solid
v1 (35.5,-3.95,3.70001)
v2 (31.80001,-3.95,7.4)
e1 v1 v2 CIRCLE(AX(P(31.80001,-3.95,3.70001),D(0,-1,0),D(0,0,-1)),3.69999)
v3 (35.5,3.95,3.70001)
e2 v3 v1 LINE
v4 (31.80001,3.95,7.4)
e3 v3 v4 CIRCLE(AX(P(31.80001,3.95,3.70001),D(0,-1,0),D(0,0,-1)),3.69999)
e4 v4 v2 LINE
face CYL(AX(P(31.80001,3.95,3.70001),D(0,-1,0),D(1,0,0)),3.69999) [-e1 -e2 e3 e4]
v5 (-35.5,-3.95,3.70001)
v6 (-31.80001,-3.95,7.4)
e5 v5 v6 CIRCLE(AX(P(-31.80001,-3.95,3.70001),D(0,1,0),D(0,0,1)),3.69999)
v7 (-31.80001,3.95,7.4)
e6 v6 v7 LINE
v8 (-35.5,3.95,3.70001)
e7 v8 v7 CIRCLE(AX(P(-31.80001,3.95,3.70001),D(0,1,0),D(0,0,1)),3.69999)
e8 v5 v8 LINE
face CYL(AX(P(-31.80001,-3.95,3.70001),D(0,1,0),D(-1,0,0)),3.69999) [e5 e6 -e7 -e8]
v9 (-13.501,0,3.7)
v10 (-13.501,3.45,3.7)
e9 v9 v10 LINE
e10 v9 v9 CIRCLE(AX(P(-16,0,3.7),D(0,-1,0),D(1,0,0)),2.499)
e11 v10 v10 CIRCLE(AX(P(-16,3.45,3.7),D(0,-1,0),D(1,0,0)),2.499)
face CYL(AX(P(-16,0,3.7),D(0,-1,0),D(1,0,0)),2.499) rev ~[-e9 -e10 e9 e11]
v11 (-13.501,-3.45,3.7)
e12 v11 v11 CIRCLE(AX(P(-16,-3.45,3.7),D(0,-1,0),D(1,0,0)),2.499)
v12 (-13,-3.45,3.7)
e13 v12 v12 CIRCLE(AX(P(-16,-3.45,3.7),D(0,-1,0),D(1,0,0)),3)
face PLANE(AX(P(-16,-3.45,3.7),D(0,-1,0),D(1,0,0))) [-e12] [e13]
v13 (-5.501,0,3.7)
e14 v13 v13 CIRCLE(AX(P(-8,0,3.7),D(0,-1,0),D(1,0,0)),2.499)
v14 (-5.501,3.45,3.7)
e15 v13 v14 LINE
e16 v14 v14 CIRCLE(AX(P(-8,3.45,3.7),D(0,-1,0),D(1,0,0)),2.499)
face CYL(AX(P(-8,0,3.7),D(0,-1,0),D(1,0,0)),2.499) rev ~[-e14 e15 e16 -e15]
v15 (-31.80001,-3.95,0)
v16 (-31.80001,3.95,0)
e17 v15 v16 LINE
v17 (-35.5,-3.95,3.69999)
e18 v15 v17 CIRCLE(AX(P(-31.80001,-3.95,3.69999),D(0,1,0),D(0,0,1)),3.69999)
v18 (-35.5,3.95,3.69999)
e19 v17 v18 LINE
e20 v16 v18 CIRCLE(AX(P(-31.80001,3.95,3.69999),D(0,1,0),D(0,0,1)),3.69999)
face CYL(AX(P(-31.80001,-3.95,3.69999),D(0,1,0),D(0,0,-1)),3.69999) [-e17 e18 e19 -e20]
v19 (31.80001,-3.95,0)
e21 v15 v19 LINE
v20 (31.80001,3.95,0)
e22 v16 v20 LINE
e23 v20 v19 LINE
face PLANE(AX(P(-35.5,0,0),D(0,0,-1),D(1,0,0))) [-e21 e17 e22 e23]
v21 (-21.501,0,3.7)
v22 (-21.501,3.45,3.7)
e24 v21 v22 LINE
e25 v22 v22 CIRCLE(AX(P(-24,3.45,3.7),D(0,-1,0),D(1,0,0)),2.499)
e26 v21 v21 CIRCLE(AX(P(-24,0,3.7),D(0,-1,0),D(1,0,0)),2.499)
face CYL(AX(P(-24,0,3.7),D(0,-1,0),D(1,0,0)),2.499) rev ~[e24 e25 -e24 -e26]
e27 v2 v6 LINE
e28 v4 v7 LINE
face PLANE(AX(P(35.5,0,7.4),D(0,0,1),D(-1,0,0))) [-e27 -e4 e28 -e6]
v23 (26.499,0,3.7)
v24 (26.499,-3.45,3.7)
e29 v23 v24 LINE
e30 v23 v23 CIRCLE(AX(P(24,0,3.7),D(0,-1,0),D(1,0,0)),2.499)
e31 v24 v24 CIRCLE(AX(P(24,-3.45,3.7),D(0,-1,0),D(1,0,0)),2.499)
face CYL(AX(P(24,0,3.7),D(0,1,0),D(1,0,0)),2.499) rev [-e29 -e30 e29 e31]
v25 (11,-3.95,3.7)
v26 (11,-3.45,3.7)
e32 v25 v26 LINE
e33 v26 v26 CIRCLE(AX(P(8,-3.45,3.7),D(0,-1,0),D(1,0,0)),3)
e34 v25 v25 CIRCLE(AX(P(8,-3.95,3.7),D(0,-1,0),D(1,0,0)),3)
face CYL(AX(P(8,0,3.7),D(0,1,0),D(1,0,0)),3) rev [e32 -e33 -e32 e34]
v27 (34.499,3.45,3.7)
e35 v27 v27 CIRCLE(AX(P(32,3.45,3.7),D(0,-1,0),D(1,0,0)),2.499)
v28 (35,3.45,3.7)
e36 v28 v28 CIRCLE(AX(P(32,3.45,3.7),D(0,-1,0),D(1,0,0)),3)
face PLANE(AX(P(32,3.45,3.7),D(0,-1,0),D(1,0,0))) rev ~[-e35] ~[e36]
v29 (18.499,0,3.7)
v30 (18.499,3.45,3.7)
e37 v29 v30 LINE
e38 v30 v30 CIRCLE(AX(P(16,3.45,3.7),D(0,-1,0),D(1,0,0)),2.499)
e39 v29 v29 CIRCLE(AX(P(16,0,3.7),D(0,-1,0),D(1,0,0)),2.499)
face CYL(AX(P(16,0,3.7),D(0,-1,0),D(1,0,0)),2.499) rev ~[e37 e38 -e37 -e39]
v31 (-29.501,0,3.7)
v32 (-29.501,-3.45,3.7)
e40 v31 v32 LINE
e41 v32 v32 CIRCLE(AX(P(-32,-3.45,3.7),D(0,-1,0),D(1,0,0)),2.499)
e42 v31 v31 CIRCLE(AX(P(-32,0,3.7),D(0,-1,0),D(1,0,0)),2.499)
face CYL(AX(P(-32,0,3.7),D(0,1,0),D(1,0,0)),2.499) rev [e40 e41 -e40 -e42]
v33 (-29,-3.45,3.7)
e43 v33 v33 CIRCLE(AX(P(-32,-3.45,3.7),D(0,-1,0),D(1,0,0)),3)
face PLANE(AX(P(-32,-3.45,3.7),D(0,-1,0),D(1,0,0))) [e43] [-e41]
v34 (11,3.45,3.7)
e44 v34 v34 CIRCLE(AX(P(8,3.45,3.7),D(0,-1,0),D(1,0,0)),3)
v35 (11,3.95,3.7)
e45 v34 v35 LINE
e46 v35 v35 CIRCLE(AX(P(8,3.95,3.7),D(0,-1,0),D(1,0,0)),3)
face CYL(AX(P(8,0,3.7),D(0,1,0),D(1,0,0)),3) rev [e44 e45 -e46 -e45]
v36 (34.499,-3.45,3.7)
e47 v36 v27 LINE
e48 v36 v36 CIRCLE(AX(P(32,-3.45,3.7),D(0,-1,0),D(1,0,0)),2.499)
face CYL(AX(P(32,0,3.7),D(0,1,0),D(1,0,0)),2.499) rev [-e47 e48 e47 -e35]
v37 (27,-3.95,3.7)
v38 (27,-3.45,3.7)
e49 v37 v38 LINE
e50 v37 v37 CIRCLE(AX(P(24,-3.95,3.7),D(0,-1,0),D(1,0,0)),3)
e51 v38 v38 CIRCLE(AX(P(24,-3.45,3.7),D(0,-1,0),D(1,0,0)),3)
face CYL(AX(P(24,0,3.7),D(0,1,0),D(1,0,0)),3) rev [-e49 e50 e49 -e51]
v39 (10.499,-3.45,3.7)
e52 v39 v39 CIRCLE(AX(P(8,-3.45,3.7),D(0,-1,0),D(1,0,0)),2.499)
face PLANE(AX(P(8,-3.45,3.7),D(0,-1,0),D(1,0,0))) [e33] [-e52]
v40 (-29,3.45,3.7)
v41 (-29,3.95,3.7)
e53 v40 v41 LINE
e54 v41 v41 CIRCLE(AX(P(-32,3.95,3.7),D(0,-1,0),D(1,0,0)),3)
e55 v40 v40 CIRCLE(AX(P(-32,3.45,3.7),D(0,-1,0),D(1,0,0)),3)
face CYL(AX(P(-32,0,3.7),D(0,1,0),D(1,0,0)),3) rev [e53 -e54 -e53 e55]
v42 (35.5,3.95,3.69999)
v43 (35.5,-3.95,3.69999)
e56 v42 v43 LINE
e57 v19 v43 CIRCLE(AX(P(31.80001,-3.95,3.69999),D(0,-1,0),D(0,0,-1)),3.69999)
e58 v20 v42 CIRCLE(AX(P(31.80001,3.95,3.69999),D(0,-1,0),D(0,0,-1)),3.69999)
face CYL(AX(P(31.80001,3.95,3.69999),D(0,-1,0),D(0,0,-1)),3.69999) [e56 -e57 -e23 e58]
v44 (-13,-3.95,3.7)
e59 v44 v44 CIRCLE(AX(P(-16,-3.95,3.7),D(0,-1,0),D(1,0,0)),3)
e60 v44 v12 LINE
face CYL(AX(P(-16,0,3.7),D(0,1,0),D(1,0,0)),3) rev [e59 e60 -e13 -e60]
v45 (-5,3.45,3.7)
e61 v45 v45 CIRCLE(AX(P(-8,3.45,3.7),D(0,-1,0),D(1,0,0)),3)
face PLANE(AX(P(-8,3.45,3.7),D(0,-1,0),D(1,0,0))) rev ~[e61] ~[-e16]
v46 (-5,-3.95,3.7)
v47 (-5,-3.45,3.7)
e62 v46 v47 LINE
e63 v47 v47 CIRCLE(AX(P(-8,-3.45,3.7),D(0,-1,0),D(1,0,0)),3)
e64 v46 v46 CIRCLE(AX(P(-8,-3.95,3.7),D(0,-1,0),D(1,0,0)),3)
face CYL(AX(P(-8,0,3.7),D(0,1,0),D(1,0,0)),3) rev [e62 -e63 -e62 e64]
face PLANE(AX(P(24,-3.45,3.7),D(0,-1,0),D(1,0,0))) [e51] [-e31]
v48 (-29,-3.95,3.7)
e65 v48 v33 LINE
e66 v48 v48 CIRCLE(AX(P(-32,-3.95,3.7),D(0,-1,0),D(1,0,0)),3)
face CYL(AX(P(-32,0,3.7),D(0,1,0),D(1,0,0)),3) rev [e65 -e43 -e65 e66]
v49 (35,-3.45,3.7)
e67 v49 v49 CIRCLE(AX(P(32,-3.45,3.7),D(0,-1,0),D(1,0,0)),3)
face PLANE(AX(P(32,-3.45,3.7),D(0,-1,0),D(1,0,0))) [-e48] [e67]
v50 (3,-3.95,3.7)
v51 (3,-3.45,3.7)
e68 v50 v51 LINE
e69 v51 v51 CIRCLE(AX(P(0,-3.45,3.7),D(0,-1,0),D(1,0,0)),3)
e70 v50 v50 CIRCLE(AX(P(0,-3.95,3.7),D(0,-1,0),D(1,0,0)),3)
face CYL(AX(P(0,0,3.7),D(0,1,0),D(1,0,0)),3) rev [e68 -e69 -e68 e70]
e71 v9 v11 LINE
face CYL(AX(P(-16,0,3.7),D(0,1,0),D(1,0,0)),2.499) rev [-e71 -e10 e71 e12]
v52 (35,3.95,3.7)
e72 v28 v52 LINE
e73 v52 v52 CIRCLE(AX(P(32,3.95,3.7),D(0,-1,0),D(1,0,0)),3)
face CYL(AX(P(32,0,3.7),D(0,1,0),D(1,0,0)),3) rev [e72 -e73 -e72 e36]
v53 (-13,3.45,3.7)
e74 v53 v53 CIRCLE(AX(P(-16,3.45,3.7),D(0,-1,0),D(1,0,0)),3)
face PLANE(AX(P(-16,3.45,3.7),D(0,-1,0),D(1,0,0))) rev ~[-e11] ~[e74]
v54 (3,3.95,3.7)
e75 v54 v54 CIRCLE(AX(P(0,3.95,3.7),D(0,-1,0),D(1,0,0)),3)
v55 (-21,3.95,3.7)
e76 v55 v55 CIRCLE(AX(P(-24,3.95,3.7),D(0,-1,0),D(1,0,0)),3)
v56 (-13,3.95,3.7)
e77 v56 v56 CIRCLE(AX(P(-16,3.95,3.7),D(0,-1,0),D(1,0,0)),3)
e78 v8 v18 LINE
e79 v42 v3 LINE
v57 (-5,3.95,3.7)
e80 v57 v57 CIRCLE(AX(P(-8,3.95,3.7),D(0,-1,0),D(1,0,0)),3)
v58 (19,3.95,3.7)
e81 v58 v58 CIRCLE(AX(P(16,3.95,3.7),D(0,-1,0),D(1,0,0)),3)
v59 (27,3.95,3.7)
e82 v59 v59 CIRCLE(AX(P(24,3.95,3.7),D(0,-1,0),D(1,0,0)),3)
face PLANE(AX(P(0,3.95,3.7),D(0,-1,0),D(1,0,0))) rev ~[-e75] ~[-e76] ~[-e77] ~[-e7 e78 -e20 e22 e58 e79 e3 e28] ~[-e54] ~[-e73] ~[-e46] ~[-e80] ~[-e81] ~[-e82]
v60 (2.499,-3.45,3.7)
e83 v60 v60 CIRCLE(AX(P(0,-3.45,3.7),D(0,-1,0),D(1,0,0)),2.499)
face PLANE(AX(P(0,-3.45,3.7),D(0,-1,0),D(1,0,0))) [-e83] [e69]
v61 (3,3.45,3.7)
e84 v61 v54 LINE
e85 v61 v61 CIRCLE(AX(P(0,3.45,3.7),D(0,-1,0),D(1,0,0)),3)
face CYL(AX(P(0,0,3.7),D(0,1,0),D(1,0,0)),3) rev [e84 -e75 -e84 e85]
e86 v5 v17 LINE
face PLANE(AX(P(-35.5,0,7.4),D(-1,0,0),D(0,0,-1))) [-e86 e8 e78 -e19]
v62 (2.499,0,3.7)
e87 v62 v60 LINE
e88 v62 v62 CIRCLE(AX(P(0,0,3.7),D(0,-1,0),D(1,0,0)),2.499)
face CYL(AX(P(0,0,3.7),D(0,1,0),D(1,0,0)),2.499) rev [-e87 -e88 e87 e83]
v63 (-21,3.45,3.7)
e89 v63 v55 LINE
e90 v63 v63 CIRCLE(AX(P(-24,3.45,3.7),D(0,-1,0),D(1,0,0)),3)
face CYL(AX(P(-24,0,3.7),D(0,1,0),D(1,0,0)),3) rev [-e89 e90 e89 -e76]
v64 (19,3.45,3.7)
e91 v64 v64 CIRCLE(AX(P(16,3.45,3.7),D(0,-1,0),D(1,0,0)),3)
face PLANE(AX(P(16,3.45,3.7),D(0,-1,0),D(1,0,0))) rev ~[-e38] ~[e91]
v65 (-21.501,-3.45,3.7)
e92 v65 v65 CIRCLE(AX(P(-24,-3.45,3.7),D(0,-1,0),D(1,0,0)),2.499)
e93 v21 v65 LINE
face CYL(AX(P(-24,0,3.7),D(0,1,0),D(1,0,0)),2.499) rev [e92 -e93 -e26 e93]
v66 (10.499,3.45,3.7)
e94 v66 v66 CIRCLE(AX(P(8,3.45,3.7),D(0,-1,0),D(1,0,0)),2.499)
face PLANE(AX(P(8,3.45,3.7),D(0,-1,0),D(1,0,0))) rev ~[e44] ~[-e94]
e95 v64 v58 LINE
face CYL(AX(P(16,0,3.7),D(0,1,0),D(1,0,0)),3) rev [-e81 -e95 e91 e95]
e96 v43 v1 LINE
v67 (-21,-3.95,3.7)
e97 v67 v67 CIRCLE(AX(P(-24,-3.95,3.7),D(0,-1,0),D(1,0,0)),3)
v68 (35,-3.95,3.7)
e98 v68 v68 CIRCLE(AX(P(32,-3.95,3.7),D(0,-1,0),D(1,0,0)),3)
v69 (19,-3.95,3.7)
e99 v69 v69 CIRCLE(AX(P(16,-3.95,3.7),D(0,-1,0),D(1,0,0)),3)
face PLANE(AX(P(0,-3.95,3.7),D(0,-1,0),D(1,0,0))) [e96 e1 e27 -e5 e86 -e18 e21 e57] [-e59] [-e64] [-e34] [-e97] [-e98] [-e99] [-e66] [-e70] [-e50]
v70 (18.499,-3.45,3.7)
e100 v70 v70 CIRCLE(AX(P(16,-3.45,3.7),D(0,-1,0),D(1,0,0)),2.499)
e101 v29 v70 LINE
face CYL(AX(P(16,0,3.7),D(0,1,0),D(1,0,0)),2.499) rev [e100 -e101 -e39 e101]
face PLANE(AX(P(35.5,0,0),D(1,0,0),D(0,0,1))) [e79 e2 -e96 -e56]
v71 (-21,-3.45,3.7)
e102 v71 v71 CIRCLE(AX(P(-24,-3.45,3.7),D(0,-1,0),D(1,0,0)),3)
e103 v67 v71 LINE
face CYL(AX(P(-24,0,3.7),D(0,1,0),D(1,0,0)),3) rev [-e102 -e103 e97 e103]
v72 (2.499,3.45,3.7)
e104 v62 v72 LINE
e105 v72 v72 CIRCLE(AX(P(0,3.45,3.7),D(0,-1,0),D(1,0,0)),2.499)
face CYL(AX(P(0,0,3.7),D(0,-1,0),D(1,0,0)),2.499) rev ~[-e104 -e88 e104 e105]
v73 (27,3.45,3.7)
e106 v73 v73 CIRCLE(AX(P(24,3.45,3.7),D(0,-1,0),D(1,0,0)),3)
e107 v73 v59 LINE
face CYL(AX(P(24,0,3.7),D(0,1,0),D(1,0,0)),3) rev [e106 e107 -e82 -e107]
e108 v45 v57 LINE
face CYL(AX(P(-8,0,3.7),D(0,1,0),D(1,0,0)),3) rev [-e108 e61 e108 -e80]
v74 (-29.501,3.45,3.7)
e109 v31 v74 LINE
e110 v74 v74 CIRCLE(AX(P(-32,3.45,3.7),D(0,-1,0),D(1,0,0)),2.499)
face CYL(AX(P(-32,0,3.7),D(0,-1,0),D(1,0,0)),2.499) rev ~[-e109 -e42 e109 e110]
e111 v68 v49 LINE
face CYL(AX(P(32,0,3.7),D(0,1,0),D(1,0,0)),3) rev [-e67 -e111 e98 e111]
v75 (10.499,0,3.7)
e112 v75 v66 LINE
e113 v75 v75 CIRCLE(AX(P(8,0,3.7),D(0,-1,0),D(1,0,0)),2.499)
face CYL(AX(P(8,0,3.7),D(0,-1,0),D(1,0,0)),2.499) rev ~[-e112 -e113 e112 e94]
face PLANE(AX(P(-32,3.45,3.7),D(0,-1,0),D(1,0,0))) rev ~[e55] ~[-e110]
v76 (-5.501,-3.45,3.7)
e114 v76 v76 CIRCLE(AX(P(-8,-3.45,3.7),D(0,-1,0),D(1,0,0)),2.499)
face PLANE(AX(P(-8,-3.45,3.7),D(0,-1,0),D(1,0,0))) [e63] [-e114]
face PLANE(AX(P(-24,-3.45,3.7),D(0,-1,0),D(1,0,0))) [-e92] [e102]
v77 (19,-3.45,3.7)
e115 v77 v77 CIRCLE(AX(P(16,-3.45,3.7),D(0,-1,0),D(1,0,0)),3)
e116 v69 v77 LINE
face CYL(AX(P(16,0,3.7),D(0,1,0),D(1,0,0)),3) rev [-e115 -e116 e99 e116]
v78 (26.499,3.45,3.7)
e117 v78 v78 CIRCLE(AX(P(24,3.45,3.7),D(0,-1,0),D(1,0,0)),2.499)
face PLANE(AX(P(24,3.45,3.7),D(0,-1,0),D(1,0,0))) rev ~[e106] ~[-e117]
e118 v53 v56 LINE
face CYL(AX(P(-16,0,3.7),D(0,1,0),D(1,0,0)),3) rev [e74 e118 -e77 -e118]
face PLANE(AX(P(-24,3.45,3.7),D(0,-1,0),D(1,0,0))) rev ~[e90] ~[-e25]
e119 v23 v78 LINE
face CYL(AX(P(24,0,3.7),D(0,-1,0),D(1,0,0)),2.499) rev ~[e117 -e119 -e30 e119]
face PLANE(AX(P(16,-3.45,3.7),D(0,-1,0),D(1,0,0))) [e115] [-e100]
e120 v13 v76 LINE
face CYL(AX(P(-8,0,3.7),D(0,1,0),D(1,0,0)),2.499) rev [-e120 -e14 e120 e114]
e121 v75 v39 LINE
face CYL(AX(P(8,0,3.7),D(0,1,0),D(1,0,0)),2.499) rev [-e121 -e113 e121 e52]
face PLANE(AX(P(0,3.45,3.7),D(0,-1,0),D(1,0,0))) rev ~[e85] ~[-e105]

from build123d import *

# Parameters (mm, degrees)
F0_R     = 3
F1_DEPTH = 3.95
F0_R_2   = 2.499
F2_DEPTH = 3.45
F3_R     = 3.69999
F4_R     = 3.69999


# Not quite as in the source:
# - a fillet or chamfer is up to 0.001 mm smaller than in the source, because OpenCascade refuses the exact size


with BuildPart() as f1:
    # F0 (on Front) → F1 (new body, symmetric)
    with BuildSketch(Plane.XZ):
        Polygon((-35.5, 0), (0, 0), (35.5, 0), (35.5, 7.4), (-35.5, 7.4), align=None)
        with Locations((-32, 3.7)):
            Circle(F0_R, mode=Mode.SUBTRACT)
        with Locations((-24, 3.7)):
            Circle(F0_R, mode=Mode.SUBTRACT)
        with Locations((-16, 3.7)):
            Circle(F0_R, mode=Mode.SUBTRACT)
        with Locations((-8, 3.7)):
            Circle(F0_R, mode=Mode.SUBTRACT)
        with Locations((0, 3.7)):
            Circle(F0_R, mode=Mode.SUBTRACT)
        with Locations((8, 3.7)):
            Circle(F0_R, mode=Mode.SUBTRACT)
        with Locations((16, 3.7)):
            Circle(F0_R, mode=Mode.SUBTRACT)
        with Locations((24, 3.7)):
            Circle(F0_R, mode=Mode.SUBTRACT)
        with Locations((32, 3.7)):
            Circle(F0_R, mode=Mode.SUBTRACT)
    extrude(amount=F1_DEPTH, both=True)

    # F0 (on Front) → F2 (join, symmetric)
    with BuildSketch(Plane.XZ):
        with Locations((0, 3.7)):
            Circle(F0_R)
        with Locations((0, 3.7)):
            Circle(F0_R_2, mode=Mode.SUBTRACT)
        with Locations((-32, 3.7)):
            Circle(F0_R)
        with Locations((-32, 3.7)):
            Circle(F0_R_2, mode=Mode.SUBTRACT)
        with Locations((-24, 3.7)):
            Circle(F0_R)
        with Locations((-24, 3.7)):
            Circle(F0_R_2, mode=Mode.SUBTRACT)
        with Locations((-16, 3.7)):
            Circle(F0_R)
        with Locations((-16, 3.7)):
            Circle(F0_R_2, mode=Mode.SUBTRACT)
        with Locations((-8, 3.7)):
            Circle(F0_R)
        with Locations((-8, 3.7)):
            Circle(F0_R_2, mode=Mode.SUBTRACT)
        with Locations((8, 3.7)):
            Circle(F0_R)
        with Locations((8, 3.7)):
            Circle(F0_R_2, mode=Mode.SUBTRACT)
        with Locations((16, 3.7)):
            Circle(F0_R)
        with Locations((16, 3.7)):
            Circle(F0_R_2, mode=Mode.SUBTRACT)
        with Locations((24, 3.7)):
            Circle(F0_R)
        with Locations((24, 3.7)):
            Circle(F0_R_2, mode=Mode.SUBTRACT)
        with Locations((32, 3.7)):
            Circle(F0_R)
        with Locations((32, 3.7)):
            Circle(F0_R_2, mode=Mode.SUBTRACT)
    extrude(amount=F2_DEPTH, both=True)

    # F3 (radius 3.7 in the source; OpenCascade refuses exactly that, so slightly less here)
    f3_edges = [f1.edges().sort_by_distance(p)[0] for p in [
        (-35.5, 0, 7.4),
        (-35.5, 0, 0),
    ]]
    fillet(f3_edges, radius=F3_R)

    # F4 (radius 3.7 in the source; OpenCascade refuses exactly that, so slightly less here)
    f4_edges = [f1.edges().sort_by_distance(p)[0] for p in [
        (35.5, 0, 7.4),
        (35.5, 0, 0),
    ]]
    fillet(f4_edges, radius=F4_R)


solid = f1.part
